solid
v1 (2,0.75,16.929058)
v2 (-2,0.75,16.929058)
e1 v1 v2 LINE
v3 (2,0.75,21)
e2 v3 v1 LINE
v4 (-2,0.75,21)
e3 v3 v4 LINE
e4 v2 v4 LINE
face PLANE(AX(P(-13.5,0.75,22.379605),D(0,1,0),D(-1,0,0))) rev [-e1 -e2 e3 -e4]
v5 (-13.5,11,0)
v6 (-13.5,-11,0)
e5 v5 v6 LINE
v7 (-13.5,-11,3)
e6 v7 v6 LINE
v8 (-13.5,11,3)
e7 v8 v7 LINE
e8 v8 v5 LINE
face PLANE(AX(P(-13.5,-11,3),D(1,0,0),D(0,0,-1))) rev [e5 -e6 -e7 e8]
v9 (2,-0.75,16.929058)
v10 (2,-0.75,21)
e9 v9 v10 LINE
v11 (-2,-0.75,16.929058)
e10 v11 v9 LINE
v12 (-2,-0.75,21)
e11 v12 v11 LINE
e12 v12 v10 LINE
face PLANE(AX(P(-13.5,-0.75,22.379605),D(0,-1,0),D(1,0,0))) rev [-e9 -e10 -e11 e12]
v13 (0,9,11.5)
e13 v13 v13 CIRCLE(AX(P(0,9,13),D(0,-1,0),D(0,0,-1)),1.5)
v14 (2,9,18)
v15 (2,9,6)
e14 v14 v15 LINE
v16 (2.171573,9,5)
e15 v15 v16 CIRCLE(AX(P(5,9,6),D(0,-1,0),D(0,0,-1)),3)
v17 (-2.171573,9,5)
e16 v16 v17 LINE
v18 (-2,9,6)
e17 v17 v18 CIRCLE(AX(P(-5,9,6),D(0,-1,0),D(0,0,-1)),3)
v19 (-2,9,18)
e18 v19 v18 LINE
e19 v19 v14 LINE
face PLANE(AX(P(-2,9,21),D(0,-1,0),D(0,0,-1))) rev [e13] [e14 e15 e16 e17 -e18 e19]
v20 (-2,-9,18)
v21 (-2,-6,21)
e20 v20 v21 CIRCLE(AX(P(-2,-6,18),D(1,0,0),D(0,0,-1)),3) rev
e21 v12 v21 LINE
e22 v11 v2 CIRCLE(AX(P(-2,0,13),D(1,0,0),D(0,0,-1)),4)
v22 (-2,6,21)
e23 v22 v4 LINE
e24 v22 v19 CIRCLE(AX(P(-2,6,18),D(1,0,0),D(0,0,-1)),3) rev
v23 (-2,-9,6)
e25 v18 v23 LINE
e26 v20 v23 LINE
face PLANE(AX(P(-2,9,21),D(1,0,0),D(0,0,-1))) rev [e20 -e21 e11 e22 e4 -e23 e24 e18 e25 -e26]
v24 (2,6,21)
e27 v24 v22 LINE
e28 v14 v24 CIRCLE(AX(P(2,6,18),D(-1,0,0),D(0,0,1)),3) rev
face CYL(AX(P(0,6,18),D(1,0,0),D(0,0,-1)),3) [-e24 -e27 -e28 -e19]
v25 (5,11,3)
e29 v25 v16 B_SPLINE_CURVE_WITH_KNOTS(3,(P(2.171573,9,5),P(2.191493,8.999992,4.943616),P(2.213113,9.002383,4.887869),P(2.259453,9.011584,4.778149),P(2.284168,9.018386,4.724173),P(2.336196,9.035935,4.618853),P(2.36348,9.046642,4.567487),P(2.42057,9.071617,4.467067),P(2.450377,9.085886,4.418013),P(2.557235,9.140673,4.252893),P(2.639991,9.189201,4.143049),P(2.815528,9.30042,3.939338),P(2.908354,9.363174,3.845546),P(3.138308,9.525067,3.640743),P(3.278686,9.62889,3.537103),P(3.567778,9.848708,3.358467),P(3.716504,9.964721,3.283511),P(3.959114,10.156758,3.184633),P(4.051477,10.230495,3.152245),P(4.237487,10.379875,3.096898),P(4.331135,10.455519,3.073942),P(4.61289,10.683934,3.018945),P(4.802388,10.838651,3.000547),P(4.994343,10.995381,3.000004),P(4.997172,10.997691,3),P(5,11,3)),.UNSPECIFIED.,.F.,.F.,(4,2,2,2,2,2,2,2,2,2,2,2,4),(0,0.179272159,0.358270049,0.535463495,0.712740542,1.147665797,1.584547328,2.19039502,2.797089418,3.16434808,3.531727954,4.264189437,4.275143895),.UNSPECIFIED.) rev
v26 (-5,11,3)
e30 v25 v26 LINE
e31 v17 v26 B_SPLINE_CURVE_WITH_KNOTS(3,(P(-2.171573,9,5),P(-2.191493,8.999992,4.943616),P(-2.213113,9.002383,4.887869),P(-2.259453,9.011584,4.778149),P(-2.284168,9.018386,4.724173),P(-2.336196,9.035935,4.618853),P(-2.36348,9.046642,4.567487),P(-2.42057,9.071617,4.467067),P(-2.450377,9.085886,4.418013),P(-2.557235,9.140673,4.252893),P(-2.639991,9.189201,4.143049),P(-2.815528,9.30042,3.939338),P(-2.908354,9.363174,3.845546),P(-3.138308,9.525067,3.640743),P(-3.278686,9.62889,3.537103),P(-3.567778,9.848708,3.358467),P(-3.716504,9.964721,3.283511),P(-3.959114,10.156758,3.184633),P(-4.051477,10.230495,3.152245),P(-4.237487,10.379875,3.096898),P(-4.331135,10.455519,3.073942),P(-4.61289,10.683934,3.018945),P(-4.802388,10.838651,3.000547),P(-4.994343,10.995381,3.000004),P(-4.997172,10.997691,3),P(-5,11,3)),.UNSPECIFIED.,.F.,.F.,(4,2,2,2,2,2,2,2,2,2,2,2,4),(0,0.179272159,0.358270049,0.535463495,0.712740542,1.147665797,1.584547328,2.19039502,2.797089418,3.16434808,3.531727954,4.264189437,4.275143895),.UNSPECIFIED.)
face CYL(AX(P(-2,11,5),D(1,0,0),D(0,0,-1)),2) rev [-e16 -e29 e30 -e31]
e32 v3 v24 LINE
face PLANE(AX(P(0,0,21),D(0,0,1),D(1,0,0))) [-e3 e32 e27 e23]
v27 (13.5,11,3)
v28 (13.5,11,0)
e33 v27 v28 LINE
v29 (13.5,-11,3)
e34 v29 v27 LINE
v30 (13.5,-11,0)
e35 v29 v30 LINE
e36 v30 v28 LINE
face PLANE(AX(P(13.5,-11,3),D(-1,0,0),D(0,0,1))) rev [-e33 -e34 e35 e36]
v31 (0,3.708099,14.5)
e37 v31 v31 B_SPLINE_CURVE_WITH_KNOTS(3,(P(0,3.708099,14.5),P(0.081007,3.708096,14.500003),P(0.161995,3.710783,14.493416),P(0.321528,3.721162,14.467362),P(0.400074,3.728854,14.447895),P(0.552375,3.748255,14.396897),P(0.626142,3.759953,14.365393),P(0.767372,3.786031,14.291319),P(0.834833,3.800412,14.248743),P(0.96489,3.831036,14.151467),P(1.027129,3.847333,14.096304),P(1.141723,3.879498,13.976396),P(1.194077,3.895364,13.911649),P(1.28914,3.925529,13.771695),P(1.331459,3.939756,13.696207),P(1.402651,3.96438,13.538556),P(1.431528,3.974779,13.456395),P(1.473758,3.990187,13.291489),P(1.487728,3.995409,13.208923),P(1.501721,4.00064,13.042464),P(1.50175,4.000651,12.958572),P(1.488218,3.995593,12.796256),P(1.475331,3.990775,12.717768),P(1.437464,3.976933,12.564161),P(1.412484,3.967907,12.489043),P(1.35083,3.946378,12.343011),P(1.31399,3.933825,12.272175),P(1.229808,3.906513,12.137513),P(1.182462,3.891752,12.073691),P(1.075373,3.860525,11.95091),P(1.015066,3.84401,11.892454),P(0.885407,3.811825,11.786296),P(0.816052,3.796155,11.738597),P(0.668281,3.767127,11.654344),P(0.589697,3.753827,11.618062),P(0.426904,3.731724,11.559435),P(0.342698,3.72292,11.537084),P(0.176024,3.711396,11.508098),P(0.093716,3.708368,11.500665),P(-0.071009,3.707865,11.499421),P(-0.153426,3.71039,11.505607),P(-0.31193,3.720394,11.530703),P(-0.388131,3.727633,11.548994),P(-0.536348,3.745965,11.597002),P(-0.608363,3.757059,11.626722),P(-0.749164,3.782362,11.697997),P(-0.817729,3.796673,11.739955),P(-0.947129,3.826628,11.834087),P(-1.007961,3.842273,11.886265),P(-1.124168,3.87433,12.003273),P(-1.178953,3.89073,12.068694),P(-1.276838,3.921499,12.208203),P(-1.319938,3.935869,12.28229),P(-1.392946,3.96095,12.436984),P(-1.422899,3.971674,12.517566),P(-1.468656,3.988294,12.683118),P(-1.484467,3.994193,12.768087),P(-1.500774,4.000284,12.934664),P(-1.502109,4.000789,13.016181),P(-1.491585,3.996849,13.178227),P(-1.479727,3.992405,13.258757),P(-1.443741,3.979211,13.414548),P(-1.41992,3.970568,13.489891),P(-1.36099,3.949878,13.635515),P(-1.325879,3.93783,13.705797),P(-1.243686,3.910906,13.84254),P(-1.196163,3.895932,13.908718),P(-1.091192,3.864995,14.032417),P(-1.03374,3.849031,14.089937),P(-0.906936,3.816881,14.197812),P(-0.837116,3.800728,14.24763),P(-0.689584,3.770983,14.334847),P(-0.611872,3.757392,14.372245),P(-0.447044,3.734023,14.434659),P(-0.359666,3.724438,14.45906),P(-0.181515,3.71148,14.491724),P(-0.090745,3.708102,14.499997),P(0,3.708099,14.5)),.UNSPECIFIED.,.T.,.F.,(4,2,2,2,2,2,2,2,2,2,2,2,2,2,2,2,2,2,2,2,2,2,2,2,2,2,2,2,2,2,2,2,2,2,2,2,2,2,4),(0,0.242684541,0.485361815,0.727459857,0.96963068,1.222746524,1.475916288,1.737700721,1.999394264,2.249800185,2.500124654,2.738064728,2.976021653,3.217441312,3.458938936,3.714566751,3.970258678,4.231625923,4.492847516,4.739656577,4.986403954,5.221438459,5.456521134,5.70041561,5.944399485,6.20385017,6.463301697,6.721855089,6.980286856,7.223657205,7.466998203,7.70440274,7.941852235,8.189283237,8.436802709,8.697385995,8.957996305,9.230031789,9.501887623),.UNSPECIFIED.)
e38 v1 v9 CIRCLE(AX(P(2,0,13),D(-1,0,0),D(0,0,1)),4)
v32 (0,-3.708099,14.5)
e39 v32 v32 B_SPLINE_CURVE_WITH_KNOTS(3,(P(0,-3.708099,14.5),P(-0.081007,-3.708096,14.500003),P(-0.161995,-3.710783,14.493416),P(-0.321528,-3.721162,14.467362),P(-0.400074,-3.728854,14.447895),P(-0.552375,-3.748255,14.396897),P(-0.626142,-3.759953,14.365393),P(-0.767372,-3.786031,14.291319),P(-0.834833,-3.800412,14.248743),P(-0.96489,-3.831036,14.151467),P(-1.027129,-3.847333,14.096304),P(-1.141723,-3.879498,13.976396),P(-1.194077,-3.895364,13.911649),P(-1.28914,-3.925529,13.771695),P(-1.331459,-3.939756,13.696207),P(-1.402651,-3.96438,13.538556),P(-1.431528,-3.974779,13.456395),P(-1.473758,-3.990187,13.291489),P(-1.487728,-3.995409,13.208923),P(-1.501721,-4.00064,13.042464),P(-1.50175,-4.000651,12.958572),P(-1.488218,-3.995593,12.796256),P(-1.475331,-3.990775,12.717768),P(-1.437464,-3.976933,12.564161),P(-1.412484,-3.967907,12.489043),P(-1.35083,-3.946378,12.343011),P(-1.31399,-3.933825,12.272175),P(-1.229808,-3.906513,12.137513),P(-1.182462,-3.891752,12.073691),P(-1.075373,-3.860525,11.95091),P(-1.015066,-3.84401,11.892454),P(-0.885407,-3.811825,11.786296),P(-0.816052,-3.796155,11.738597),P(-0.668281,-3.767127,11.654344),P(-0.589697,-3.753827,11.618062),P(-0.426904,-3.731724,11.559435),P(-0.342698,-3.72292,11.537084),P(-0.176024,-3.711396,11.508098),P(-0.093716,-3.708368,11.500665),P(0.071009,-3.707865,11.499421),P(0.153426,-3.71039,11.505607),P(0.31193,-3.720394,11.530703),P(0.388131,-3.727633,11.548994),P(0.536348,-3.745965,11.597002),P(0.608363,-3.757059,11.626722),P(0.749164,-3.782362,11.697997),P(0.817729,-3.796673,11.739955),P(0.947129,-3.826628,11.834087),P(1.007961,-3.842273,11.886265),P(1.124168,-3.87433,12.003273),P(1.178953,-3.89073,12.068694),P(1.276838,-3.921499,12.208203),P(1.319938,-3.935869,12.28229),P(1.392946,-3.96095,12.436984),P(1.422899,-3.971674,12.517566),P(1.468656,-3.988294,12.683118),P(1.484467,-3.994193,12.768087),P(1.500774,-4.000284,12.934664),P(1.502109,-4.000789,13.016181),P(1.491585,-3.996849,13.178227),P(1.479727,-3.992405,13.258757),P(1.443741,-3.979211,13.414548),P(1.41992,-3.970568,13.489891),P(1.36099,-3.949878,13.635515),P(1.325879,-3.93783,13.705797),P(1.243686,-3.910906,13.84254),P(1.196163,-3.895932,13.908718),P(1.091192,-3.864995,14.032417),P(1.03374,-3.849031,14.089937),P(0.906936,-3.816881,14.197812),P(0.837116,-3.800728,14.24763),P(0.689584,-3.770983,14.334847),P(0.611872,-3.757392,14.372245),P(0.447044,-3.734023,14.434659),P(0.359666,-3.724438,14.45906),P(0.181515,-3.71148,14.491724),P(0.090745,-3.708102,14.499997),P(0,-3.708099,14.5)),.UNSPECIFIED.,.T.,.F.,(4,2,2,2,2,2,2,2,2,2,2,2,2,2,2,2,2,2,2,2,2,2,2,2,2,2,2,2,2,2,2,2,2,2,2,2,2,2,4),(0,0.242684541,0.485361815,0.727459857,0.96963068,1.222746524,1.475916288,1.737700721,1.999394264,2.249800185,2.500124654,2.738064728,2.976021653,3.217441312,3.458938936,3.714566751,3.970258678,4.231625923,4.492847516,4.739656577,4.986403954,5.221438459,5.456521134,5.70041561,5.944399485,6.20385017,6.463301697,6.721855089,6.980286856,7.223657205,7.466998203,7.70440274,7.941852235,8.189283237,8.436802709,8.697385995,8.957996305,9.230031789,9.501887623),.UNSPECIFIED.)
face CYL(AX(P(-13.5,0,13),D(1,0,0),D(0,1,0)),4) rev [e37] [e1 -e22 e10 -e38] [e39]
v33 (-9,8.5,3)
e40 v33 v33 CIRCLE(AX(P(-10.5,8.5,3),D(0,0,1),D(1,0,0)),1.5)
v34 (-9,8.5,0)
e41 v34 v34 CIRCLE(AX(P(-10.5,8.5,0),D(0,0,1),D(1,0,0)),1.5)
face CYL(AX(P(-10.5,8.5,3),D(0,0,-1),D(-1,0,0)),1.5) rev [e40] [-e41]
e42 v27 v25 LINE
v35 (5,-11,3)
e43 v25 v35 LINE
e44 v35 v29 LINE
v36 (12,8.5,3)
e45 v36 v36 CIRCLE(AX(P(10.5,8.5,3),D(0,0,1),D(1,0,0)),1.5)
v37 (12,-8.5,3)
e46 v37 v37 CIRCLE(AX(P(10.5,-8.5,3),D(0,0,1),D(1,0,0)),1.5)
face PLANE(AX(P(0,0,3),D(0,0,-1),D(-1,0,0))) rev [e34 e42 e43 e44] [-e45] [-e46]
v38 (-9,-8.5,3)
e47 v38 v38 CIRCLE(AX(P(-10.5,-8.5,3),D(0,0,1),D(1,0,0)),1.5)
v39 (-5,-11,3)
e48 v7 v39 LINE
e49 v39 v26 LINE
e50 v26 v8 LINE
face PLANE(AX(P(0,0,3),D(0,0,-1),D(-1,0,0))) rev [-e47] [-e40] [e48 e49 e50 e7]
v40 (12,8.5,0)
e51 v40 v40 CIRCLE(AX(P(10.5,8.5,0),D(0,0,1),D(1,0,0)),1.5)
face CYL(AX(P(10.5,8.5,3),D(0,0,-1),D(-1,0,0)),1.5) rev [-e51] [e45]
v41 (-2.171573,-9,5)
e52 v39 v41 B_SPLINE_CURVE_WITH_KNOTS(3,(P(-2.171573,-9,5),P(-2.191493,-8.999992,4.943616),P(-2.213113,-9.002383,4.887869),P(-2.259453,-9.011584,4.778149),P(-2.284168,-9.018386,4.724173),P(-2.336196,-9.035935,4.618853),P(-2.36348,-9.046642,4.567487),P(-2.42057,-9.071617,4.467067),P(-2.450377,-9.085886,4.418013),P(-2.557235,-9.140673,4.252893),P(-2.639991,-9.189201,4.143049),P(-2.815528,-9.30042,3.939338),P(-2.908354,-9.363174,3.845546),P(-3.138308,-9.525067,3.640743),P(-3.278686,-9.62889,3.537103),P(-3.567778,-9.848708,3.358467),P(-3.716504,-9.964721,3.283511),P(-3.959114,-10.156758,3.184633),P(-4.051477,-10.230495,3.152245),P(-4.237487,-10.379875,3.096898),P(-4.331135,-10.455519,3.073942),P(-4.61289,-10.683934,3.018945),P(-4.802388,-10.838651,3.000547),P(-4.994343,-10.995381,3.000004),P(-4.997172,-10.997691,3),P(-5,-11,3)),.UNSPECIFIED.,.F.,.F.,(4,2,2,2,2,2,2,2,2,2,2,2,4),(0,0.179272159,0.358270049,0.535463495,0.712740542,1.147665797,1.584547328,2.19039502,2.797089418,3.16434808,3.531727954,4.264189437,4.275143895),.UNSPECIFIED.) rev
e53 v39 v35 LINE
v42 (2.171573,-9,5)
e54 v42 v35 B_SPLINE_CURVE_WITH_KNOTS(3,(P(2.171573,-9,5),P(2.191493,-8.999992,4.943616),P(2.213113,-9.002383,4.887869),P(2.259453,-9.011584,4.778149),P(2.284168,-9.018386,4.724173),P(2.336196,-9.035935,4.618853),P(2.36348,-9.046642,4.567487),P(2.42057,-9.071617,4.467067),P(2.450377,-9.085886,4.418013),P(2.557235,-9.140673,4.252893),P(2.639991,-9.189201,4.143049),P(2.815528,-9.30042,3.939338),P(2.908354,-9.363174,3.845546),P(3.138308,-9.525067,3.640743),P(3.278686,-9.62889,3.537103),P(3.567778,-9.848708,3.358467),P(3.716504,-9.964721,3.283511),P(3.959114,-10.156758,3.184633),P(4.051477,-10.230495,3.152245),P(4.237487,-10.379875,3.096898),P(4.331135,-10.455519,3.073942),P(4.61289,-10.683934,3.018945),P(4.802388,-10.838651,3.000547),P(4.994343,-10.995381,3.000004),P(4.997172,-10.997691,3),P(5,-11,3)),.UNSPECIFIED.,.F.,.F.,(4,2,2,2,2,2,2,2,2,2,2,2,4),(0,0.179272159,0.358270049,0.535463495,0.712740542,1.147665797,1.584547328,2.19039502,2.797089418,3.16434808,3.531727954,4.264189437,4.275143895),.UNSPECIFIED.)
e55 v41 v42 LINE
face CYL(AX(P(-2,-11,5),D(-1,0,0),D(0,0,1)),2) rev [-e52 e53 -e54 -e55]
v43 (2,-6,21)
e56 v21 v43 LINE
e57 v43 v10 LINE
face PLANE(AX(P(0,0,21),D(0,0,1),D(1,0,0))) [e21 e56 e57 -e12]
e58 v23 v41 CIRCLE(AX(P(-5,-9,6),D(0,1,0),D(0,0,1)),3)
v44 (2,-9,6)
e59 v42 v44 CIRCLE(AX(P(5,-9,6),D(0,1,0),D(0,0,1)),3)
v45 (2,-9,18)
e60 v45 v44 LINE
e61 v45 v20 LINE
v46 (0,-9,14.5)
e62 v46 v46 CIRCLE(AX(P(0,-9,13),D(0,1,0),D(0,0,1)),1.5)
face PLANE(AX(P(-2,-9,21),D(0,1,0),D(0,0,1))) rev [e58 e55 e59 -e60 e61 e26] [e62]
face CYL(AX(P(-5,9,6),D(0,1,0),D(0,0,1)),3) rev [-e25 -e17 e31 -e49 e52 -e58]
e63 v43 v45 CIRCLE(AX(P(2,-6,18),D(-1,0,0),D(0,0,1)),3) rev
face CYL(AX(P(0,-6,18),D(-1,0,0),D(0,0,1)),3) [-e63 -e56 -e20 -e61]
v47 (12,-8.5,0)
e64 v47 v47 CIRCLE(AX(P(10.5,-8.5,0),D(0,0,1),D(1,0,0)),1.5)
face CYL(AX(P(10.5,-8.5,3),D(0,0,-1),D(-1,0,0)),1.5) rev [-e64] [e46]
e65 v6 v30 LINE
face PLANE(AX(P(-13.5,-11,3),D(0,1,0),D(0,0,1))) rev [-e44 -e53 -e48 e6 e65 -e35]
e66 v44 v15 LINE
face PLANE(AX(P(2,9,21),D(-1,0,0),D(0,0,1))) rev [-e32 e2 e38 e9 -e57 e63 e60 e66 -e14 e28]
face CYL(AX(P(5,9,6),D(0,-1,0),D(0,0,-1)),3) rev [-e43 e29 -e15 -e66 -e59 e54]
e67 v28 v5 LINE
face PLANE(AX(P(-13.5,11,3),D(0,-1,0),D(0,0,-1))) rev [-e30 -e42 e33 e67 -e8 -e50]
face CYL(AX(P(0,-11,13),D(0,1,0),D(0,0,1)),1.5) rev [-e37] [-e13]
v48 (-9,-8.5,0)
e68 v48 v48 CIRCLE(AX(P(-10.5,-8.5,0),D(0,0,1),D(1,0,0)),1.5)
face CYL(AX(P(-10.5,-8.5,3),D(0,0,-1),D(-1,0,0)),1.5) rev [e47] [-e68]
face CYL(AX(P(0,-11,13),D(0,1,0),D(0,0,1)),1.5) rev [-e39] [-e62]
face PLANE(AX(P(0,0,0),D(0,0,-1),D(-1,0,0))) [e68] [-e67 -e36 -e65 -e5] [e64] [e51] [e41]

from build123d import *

# Parameters (mm, degrees)
SKETCH1_W               = 27
SKETCH1_H               = 22
SKETCH1_R               = 1.5
BOSS_EXTRUDE1_DEPTH     = 3
SKETCH2_W               = 4
SKETCH2_H               = 18
BOSS_EXTRUDE2_DEPTH     = 18
CUT_EXTRUDE1_DEPTH      = 29.324018077
CUT_EXTRUDE1_DEPTH_BACK = 29.324018077
SKETCH3_R               = 4
CUT_EXTRUDE2_DEPTH      = 29.324018077
CUT_EXTRUDE2_DEPTH_BACK = 29.324018077
SKETCH4_W               = 8.09758535
SKETCH4_H               = 1.5
FILLET1_R               = 3
CUT_EXTRUDE3_DEPTH      = 34.275366264
CUT_EXTRUDE3_DEPTH_BACK = 34.275366264
SKETCH5_R               = 1.5
FILLET2_R               = 2
FILLET3_R               = 3


with BuildPart() as part:
    # Sketch1 → Boss-Extrude1 (new body)
    with BuildSketch(Plane.XY):
        Rectangle(SKETCH1_W, SKETCH1_H)
        with Locations((-10.5, -8.5)):
            Circle(SKETCH1_R, mode=Mode.SUBTRACT)
        with Locations((-10.5, 8.5)):
            Circle(SKETCH1_R, mode=Mode.SUBTRACT)
        with Locations((10.5, 8.5)):
            Circle(SKETCH1_R, mode=Mode.SUBTRACT)
        with Locations((10.5, -8.5)):
            Circle(SKETCH1_R, mode=Mode.SUBTRACT)
    extrude(amount=BOSS_EXTRUDE1_DEPTH)

    # Sketch2 → Boss-Extrude2 (add)
    with BuildSketch(Plane.XY.offset(3)):
        Rectangle(SKETCH2_W, SKETCH2_H)
    extrude(amount=BOSS_EXTRUDE2_DEPTH)

    # Sketch3 → Cut-Extrude1 (cut, two sides: drawn at the far end of the back side and taken through both)
    with BuildSketch(Plane(origin=(2, 0, 0), x_dir=(0, 0, -1), z_dir=(1, 0, 0)).offset(-CUT_EXTRUDE1_DEPTH_BACK)):
        with Locations(Location((-13, 0, 0), (0, 0, 180))):
            Circle(SKETCH3_R)
    extrude(amount=CUT_EXTRUDE1_DEPTH + CUT_EXTRUDE1_DEPTH_BACK, mode=Mode.SUBTRACT)

    # Sketch4 → Cut-Extrude2 (cut, two sides: drawn at the far end of the back side and taken through both)
    with BuildSketch(Plane(origin=(2, 0, 0), x_dir=(0, 0, -1), z_dir=(1, 0, 0)).offset(-CUT_EXTRUDE2_DEPTH_BACK)):
        with Locations((-18.330812417, 0)):
            Rectangle(SKETCH4_W, SKETCH4_H)
    extrude(amount=CUT_EXTRUDE2_DEPTH + CUT_EXTRUDE2_DEPTH_BACK, mode=Mode.SUBTRACT)

    # Fillet1
    fillet1_edges = [part.edges().sort_by_distance(p)[0] for p in [
        (-2, 0, 3),
        (2, 0, 3),
    ]]
    fillet(fillet1_edges, radius=FILLET1_R)

    # Sketch5 → Cut-Extrude3 (cut, two sides: drawn at the far end of the back side and taken through both)
    with BuildSketch(Plane(origin=(0, 11, 0), x_dir=(1, 0, 0), z_dir=(0, 1, 0)).offset(-CUT_EXTRUDE3_DEPTH_BACK)):
        with Locations(Location((0, -13, 0), (0, 0, 270))):
            Circle(SKETCH5_R)
    extrude(amount=CUT_EXTRUDE3_DEPTH + CUT_EXTRUDE3_DEPTH_BACK, mode=Mode.SUBTRACT)

    # Fillet2
    fillet2_edges = [part.edges().sort_by_distance(p)[0] for p in [
        (0, -9, 3),
        (0, 9, 3),
    ]]
    fillet(fillet2_edges, radius=FILLET2_R - 0.0001)  # a hair under: the kernel refuses the full size

    # Fillet3
    fillet3_edges = [part.edges().sort_by_distance(p)[0] for p in [
        (0, -9, 21),
        (0, 9, 21),
    ]]
    fillet(fillet3_edges, radius=FILLET3_R)


solid = part.part
